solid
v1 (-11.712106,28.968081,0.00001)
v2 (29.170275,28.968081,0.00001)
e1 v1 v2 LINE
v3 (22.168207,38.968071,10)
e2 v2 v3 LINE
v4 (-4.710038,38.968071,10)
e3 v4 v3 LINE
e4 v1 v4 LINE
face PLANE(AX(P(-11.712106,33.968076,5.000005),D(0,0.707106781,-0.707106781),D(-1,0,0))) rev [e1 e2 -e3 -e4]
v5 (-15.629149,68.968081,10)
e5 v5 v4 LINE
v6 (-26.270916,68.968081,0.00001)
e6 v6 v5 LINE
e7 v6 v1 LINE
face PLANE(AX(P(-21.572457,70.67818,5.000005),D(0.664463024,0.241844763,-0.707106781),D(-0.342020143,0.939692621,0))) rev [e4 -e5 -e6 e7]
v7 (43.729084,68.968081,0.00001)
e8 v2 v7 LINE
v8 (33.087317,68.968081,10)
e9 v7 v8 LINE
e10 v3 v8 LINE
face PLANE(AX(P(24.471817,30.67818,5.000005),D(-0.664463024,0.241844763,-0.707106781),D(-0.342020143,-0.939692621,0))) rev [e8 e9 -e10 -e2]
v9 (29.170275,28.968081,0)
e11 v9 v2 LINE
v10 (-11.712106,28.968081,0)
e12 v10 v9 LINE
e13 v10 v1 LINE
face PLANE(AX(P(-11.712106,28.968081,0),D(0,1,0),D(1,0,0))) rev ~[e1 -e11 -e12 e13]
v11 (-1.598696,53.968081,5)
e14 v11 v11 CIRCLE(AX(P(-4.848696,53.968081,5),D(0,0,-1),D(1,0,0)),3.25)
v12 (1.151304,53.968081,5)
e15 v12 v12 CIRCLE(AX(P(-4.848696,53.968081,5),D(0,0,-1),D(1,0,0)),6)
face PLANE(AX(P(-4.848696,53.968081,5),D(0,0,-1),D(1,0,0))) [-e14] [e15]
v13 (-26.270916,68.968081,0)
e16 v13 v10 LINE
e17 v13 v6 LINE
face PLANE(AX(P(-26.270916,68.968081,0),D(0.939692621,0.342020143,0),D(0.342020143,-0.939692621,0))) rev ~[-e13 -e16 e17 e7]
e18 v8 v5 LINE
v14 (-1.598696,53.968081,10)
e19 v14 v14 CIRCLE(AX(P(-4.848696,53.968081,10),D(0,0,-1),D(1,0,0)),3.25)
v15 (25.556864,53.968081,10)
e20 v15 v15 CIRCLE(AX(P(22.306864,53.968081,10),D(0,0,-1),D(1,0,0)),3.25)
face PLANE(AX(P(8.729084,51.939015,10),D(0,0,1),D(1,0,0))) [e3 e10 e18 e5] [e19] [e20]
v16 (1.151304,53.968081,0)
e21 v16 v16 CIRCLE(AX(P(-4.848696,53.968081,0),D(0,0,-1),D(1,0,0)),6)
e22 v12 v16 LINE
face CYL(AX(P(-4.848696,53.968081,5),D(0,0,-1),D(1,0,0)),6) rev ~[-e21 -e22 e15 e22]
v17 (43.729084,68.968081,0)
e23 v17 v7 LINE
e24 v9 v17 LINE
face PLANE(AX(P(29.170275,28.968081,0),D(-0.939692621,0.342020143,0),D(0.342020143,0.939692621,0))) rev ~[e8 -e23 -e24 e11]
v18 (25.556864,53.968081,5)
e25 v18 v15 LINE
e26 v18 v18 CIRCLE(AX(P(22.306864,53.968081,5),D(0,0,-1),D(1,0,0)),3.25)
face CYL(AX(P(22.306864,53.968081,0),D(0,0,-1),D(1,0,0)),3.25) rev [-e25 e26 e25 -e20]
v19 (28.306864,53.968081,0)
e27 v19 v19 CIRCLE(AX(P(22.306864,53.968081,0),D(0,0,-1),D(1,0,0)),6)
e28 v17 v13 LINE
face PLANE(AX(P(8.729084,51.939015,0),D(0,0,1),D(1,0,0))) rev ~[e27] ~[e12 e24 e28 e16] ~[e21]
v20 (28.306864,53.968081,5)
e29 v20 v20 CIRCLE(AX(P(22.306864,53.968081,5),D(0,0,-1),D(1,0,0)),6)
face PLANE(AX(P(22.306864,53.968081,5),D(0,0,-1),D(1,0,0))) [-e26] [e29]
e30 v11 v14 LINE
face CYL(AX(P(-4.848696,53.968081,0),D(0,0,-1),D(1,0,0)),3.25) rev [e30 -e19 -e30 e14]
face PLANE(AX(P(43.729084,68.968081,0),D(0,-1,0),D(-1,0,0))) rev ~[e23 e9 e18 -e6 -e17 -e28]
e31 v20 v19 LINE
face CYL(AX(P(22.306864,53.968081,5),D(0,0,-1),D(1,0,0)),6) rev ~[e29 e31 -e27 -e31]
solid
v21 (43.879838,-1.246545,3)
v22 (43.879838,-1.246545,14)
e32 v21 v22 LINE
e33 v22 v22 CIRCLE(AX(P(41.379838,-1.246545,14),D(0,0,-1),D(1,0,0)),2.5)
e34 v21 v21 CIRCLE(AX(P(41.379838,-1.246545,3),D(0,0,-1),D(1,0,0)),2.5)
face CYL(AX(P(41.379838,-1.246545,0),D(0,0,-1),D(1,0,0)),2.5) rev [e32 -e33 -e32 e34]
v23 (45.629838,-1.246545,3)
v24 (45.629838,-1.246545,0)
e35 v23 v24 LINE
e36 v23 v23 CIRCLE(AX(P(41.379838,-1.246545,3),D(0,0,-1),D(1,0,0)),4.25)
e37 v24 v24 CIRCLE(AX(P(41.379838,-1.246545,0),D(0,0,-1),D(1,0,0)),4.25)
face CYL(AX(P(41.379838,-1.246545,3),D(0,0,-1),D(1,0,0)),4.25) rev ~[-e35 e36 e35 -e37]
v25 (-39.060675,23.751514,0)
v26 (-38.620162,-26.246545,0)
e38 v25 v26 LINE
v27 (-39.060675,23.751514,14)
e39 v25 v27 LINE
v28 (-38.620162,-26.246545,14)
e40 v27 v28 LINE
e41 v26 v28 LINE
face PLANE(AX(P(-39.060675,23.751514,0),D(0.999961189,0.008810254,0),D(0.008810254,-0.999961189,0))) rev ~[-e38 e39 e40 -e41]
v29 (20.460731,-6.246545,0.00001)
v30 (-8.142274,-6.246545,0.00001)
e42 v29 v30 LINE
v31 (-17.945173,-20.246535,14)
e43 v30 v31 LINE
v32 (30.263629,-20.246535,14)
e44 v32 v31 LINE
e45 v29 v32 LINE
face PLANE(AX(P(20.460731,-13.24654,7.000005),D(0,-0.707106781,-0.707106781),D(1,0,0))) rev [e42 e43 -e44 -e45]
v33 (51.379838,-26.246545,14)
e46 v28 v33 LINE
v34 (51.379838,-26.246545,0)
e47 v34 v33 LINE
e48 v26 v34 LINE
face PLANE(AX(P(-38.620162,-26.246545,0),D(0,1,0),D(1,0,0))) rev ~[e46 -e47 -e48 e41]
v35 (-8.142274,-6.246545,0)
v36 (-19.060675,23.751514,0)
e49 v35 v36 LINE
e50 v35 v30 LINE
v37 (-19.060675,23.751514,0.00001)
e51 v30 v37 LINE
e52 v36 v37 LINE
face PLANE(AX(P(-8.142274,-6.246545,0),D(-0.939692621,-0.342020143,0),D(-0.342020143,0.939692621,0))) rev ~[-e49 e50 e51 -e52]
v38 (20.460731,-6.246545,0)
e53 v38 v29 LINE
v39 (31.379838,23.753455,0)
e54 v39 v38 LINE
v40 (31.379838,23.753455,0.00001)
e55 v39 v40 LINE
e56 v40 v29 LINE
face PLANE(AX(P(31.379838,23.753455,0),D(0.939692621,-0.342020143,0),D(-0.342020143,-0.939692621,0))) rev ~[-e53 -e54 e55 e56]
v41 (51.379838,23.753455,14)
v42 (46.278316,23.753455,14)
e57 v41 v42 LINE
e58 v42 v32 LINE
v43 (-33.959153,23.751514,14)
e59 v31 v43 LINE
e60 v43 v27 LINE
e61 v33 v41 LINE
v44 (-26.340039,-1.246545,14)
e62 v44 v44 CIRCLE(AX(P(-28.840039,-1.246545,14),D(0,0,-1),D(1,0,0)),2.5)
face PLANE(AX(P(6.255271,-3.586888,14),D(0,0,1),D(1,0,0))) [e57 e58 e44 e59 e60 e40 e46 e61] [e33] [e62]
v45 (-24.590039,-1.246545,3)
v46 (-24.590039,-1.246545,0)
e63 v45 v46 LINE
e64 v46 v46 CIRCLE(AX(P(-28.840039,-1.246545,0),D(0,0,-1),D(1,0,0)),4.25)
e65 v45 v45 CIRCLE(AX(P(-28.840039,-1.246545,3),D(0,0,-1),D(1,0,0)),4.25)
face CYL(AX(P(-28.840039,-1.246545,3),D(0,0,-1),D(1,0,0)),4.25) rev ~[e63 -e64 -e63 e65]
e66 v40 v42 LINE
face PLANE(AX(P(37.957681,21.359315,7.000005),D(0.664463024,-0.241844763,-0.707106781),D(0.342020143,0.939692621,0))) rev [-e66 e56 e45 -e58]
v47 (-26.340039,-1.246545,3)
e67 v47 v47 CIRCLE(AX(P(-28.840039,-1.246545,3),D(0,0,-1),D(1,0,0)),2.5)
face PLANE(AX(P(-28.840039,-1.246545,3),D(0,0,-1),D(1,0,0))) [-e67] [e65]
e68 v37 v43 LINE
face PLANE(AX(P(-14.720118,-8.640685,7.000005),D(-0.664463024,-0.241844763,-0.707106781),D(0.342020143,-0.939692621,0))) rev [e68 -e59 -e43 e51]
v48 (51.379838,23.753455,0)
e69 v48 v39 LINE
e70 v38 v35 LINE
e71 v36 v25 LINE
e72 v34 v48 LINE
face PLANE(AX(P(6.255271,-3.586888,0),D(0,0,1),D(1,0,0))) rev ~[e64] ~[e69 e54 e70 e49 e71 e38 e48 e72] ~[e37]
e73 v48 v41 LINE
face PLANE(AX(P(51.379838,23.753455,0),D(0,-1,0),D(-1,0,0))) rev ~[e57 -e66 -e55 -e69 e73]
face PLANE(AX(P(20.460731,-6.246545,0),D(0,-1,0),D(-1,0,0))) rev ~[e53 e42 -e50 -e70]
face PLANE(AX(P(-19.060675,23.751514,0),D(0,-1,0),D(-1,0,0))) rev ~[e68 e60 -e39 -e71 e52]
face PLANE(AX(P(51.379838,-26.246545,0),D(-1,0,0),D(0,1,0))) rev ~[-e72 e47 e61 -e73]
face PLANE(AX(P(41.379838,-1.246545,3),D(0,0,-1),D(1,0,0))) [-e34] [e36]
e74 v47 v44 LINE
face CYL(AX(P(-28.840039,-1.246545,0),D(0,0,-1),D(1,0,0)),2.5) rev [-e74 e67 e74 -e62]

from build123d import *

# Parameters (mm, degrees)
F0_R           = 2.5
F1_DEPTH       = 14
F2_SIZE        = 13.99999
F3_R           = 3.25
F4_DEPTH       = 10
F5_SIZE        = 9.99999
F6_D           = 6.5
F6_CBORE_D     = 12
F6_CBORE_DEPTH = 5
F7_D           = 6.5
F7_CBORE_D     = 12
F7_CBORE_DEPTH = 5
F8_D           = 5
F8_CBORE_D     = 8.5
F8_CBORE_DEPTH = 3
F9_D           = 5
F9_CBORE_D     = 8.5
F9_CBORE_DEPTH = 3


# Not quite as in the source:
# - a fillet or chamfer is up to 0.001 mm smaller than in the source, because OpenCascade refuses the exact size


with BuildPart() as f1:
    # F0 (on Top) → F1 (new body)
    with BuildSketch(Plane.XY):
        Polygon((-19.0606748313, 23.7515140325), (-39.0606748313, 23.7515140325), (-38.6201621495, -26.2465454156), (51.3798378505, -26.2465454156), (51.3798378505, 23.7534545844), (31.3798378505, 23.7534545844), (20.4607308225, -6.2465454156), (-8.1422741064, -6.2465454156), align=None)
        with Locations((-28.8400389136, -1.2465454156)):
            Circle(F0_R, mode=Mode.SUBTRACT)
        with Locations((41.3798378505, -1.2465454156)):
            Circle(F0_R, mode=Mode.SUBTRACT)
    extrude(amount=F1_DEPTH)

    # F2 (size 14 in the source; OpenCascade refuses exactly that, so slightly less here)
    f2_edges = [f1.edges().sort_by_distance(p)[0] for p in [
        (-13.601474, 8.752484, 14),
        (6.159228, -6.246545, 14),
        (25.920284, 8.753455, 14),
    ]]
    chamfer(f2_edges, length=F2_SIZE)

    # F8 (through all)
    with Locations(Plane(origin=(0, 0, 0), x_dir=(1, 0, 0), z_dir=(0, 0, -1))):
        with Locations((-28.8400389136, 1.2465454156)):
            CounterBoreHole(F8_D / 2, F8_CBORE_D / 2, F8_CBORE_DEPTH)

    # F9 (through all)
    with Locations(Plane(origin=(0, 0, 0), x_dir=(1, 0, 0), z_dir=(0, 0, -1))):
        with Locations((41.3798378505, 1.2465454156)):
            CounterBoreHole(F9_D / 2, F9_CBORE_D / 2, F9_CBORE_DEPTH)


with BuildPart() as f4:
    # F3 (on Top) → F4 (new body)
    with BuildSketch(Plane.XY):
        Polygon((43.7290843949, 68.9680808707), (-26.2709156051, 68.9680808707), (-11.7121062345, 28.9680808707), (29.1702750242, 28.9680808707), align=None)
        with Locations((-4.848695504, 53.9680808707)):
            Circle(F3_R, mode=Mode.SUBTRACT)
        with Locations((22.3068642937, 53.9680808707)):
            Circle(F3_R, mode=Mode.SUBTRACT)
    extrude(amount=F4_DEPTH)

    # F5 (size 10 in the source; OpenCascade refuses exactly that, so slightly less here)
    f5_edges = [f4.edges().sort_by_distance(p)[0] for p in [
        (8.729084, 28.968081, 10),
        (-18.991511, 48.968081, 10),
        (36.44968, 48.968081, 10),
    ]]
    chamfer(f5_edges, length=F5_SIZE)

    # F6 (through all)
    with Locations(Plane(origin=(0, 0, 0), x_dir=(1, 0, 0), z_dir=(0, 0, -1))):
        with Locations((-4.848695504, -53.9680808707)):
            CounterBoreHole(F6_D / 2, F6_CBORE_D / 2, F6_CBORE_DEPTH)

    # F7 (through all)
    with Locations(Plane(origin=(0, 0, 0), x_dir=(1, 0, 0), z_dir=(0, 0, -1))):
        with Locations((22.3068642937, -53.9680808707)):
            CounterBoreHole(F7_D / 2, F7_CBORE_D / 2, F7_CBORE_DEPTH)


solid = Compound([f1.part, f4.part])
